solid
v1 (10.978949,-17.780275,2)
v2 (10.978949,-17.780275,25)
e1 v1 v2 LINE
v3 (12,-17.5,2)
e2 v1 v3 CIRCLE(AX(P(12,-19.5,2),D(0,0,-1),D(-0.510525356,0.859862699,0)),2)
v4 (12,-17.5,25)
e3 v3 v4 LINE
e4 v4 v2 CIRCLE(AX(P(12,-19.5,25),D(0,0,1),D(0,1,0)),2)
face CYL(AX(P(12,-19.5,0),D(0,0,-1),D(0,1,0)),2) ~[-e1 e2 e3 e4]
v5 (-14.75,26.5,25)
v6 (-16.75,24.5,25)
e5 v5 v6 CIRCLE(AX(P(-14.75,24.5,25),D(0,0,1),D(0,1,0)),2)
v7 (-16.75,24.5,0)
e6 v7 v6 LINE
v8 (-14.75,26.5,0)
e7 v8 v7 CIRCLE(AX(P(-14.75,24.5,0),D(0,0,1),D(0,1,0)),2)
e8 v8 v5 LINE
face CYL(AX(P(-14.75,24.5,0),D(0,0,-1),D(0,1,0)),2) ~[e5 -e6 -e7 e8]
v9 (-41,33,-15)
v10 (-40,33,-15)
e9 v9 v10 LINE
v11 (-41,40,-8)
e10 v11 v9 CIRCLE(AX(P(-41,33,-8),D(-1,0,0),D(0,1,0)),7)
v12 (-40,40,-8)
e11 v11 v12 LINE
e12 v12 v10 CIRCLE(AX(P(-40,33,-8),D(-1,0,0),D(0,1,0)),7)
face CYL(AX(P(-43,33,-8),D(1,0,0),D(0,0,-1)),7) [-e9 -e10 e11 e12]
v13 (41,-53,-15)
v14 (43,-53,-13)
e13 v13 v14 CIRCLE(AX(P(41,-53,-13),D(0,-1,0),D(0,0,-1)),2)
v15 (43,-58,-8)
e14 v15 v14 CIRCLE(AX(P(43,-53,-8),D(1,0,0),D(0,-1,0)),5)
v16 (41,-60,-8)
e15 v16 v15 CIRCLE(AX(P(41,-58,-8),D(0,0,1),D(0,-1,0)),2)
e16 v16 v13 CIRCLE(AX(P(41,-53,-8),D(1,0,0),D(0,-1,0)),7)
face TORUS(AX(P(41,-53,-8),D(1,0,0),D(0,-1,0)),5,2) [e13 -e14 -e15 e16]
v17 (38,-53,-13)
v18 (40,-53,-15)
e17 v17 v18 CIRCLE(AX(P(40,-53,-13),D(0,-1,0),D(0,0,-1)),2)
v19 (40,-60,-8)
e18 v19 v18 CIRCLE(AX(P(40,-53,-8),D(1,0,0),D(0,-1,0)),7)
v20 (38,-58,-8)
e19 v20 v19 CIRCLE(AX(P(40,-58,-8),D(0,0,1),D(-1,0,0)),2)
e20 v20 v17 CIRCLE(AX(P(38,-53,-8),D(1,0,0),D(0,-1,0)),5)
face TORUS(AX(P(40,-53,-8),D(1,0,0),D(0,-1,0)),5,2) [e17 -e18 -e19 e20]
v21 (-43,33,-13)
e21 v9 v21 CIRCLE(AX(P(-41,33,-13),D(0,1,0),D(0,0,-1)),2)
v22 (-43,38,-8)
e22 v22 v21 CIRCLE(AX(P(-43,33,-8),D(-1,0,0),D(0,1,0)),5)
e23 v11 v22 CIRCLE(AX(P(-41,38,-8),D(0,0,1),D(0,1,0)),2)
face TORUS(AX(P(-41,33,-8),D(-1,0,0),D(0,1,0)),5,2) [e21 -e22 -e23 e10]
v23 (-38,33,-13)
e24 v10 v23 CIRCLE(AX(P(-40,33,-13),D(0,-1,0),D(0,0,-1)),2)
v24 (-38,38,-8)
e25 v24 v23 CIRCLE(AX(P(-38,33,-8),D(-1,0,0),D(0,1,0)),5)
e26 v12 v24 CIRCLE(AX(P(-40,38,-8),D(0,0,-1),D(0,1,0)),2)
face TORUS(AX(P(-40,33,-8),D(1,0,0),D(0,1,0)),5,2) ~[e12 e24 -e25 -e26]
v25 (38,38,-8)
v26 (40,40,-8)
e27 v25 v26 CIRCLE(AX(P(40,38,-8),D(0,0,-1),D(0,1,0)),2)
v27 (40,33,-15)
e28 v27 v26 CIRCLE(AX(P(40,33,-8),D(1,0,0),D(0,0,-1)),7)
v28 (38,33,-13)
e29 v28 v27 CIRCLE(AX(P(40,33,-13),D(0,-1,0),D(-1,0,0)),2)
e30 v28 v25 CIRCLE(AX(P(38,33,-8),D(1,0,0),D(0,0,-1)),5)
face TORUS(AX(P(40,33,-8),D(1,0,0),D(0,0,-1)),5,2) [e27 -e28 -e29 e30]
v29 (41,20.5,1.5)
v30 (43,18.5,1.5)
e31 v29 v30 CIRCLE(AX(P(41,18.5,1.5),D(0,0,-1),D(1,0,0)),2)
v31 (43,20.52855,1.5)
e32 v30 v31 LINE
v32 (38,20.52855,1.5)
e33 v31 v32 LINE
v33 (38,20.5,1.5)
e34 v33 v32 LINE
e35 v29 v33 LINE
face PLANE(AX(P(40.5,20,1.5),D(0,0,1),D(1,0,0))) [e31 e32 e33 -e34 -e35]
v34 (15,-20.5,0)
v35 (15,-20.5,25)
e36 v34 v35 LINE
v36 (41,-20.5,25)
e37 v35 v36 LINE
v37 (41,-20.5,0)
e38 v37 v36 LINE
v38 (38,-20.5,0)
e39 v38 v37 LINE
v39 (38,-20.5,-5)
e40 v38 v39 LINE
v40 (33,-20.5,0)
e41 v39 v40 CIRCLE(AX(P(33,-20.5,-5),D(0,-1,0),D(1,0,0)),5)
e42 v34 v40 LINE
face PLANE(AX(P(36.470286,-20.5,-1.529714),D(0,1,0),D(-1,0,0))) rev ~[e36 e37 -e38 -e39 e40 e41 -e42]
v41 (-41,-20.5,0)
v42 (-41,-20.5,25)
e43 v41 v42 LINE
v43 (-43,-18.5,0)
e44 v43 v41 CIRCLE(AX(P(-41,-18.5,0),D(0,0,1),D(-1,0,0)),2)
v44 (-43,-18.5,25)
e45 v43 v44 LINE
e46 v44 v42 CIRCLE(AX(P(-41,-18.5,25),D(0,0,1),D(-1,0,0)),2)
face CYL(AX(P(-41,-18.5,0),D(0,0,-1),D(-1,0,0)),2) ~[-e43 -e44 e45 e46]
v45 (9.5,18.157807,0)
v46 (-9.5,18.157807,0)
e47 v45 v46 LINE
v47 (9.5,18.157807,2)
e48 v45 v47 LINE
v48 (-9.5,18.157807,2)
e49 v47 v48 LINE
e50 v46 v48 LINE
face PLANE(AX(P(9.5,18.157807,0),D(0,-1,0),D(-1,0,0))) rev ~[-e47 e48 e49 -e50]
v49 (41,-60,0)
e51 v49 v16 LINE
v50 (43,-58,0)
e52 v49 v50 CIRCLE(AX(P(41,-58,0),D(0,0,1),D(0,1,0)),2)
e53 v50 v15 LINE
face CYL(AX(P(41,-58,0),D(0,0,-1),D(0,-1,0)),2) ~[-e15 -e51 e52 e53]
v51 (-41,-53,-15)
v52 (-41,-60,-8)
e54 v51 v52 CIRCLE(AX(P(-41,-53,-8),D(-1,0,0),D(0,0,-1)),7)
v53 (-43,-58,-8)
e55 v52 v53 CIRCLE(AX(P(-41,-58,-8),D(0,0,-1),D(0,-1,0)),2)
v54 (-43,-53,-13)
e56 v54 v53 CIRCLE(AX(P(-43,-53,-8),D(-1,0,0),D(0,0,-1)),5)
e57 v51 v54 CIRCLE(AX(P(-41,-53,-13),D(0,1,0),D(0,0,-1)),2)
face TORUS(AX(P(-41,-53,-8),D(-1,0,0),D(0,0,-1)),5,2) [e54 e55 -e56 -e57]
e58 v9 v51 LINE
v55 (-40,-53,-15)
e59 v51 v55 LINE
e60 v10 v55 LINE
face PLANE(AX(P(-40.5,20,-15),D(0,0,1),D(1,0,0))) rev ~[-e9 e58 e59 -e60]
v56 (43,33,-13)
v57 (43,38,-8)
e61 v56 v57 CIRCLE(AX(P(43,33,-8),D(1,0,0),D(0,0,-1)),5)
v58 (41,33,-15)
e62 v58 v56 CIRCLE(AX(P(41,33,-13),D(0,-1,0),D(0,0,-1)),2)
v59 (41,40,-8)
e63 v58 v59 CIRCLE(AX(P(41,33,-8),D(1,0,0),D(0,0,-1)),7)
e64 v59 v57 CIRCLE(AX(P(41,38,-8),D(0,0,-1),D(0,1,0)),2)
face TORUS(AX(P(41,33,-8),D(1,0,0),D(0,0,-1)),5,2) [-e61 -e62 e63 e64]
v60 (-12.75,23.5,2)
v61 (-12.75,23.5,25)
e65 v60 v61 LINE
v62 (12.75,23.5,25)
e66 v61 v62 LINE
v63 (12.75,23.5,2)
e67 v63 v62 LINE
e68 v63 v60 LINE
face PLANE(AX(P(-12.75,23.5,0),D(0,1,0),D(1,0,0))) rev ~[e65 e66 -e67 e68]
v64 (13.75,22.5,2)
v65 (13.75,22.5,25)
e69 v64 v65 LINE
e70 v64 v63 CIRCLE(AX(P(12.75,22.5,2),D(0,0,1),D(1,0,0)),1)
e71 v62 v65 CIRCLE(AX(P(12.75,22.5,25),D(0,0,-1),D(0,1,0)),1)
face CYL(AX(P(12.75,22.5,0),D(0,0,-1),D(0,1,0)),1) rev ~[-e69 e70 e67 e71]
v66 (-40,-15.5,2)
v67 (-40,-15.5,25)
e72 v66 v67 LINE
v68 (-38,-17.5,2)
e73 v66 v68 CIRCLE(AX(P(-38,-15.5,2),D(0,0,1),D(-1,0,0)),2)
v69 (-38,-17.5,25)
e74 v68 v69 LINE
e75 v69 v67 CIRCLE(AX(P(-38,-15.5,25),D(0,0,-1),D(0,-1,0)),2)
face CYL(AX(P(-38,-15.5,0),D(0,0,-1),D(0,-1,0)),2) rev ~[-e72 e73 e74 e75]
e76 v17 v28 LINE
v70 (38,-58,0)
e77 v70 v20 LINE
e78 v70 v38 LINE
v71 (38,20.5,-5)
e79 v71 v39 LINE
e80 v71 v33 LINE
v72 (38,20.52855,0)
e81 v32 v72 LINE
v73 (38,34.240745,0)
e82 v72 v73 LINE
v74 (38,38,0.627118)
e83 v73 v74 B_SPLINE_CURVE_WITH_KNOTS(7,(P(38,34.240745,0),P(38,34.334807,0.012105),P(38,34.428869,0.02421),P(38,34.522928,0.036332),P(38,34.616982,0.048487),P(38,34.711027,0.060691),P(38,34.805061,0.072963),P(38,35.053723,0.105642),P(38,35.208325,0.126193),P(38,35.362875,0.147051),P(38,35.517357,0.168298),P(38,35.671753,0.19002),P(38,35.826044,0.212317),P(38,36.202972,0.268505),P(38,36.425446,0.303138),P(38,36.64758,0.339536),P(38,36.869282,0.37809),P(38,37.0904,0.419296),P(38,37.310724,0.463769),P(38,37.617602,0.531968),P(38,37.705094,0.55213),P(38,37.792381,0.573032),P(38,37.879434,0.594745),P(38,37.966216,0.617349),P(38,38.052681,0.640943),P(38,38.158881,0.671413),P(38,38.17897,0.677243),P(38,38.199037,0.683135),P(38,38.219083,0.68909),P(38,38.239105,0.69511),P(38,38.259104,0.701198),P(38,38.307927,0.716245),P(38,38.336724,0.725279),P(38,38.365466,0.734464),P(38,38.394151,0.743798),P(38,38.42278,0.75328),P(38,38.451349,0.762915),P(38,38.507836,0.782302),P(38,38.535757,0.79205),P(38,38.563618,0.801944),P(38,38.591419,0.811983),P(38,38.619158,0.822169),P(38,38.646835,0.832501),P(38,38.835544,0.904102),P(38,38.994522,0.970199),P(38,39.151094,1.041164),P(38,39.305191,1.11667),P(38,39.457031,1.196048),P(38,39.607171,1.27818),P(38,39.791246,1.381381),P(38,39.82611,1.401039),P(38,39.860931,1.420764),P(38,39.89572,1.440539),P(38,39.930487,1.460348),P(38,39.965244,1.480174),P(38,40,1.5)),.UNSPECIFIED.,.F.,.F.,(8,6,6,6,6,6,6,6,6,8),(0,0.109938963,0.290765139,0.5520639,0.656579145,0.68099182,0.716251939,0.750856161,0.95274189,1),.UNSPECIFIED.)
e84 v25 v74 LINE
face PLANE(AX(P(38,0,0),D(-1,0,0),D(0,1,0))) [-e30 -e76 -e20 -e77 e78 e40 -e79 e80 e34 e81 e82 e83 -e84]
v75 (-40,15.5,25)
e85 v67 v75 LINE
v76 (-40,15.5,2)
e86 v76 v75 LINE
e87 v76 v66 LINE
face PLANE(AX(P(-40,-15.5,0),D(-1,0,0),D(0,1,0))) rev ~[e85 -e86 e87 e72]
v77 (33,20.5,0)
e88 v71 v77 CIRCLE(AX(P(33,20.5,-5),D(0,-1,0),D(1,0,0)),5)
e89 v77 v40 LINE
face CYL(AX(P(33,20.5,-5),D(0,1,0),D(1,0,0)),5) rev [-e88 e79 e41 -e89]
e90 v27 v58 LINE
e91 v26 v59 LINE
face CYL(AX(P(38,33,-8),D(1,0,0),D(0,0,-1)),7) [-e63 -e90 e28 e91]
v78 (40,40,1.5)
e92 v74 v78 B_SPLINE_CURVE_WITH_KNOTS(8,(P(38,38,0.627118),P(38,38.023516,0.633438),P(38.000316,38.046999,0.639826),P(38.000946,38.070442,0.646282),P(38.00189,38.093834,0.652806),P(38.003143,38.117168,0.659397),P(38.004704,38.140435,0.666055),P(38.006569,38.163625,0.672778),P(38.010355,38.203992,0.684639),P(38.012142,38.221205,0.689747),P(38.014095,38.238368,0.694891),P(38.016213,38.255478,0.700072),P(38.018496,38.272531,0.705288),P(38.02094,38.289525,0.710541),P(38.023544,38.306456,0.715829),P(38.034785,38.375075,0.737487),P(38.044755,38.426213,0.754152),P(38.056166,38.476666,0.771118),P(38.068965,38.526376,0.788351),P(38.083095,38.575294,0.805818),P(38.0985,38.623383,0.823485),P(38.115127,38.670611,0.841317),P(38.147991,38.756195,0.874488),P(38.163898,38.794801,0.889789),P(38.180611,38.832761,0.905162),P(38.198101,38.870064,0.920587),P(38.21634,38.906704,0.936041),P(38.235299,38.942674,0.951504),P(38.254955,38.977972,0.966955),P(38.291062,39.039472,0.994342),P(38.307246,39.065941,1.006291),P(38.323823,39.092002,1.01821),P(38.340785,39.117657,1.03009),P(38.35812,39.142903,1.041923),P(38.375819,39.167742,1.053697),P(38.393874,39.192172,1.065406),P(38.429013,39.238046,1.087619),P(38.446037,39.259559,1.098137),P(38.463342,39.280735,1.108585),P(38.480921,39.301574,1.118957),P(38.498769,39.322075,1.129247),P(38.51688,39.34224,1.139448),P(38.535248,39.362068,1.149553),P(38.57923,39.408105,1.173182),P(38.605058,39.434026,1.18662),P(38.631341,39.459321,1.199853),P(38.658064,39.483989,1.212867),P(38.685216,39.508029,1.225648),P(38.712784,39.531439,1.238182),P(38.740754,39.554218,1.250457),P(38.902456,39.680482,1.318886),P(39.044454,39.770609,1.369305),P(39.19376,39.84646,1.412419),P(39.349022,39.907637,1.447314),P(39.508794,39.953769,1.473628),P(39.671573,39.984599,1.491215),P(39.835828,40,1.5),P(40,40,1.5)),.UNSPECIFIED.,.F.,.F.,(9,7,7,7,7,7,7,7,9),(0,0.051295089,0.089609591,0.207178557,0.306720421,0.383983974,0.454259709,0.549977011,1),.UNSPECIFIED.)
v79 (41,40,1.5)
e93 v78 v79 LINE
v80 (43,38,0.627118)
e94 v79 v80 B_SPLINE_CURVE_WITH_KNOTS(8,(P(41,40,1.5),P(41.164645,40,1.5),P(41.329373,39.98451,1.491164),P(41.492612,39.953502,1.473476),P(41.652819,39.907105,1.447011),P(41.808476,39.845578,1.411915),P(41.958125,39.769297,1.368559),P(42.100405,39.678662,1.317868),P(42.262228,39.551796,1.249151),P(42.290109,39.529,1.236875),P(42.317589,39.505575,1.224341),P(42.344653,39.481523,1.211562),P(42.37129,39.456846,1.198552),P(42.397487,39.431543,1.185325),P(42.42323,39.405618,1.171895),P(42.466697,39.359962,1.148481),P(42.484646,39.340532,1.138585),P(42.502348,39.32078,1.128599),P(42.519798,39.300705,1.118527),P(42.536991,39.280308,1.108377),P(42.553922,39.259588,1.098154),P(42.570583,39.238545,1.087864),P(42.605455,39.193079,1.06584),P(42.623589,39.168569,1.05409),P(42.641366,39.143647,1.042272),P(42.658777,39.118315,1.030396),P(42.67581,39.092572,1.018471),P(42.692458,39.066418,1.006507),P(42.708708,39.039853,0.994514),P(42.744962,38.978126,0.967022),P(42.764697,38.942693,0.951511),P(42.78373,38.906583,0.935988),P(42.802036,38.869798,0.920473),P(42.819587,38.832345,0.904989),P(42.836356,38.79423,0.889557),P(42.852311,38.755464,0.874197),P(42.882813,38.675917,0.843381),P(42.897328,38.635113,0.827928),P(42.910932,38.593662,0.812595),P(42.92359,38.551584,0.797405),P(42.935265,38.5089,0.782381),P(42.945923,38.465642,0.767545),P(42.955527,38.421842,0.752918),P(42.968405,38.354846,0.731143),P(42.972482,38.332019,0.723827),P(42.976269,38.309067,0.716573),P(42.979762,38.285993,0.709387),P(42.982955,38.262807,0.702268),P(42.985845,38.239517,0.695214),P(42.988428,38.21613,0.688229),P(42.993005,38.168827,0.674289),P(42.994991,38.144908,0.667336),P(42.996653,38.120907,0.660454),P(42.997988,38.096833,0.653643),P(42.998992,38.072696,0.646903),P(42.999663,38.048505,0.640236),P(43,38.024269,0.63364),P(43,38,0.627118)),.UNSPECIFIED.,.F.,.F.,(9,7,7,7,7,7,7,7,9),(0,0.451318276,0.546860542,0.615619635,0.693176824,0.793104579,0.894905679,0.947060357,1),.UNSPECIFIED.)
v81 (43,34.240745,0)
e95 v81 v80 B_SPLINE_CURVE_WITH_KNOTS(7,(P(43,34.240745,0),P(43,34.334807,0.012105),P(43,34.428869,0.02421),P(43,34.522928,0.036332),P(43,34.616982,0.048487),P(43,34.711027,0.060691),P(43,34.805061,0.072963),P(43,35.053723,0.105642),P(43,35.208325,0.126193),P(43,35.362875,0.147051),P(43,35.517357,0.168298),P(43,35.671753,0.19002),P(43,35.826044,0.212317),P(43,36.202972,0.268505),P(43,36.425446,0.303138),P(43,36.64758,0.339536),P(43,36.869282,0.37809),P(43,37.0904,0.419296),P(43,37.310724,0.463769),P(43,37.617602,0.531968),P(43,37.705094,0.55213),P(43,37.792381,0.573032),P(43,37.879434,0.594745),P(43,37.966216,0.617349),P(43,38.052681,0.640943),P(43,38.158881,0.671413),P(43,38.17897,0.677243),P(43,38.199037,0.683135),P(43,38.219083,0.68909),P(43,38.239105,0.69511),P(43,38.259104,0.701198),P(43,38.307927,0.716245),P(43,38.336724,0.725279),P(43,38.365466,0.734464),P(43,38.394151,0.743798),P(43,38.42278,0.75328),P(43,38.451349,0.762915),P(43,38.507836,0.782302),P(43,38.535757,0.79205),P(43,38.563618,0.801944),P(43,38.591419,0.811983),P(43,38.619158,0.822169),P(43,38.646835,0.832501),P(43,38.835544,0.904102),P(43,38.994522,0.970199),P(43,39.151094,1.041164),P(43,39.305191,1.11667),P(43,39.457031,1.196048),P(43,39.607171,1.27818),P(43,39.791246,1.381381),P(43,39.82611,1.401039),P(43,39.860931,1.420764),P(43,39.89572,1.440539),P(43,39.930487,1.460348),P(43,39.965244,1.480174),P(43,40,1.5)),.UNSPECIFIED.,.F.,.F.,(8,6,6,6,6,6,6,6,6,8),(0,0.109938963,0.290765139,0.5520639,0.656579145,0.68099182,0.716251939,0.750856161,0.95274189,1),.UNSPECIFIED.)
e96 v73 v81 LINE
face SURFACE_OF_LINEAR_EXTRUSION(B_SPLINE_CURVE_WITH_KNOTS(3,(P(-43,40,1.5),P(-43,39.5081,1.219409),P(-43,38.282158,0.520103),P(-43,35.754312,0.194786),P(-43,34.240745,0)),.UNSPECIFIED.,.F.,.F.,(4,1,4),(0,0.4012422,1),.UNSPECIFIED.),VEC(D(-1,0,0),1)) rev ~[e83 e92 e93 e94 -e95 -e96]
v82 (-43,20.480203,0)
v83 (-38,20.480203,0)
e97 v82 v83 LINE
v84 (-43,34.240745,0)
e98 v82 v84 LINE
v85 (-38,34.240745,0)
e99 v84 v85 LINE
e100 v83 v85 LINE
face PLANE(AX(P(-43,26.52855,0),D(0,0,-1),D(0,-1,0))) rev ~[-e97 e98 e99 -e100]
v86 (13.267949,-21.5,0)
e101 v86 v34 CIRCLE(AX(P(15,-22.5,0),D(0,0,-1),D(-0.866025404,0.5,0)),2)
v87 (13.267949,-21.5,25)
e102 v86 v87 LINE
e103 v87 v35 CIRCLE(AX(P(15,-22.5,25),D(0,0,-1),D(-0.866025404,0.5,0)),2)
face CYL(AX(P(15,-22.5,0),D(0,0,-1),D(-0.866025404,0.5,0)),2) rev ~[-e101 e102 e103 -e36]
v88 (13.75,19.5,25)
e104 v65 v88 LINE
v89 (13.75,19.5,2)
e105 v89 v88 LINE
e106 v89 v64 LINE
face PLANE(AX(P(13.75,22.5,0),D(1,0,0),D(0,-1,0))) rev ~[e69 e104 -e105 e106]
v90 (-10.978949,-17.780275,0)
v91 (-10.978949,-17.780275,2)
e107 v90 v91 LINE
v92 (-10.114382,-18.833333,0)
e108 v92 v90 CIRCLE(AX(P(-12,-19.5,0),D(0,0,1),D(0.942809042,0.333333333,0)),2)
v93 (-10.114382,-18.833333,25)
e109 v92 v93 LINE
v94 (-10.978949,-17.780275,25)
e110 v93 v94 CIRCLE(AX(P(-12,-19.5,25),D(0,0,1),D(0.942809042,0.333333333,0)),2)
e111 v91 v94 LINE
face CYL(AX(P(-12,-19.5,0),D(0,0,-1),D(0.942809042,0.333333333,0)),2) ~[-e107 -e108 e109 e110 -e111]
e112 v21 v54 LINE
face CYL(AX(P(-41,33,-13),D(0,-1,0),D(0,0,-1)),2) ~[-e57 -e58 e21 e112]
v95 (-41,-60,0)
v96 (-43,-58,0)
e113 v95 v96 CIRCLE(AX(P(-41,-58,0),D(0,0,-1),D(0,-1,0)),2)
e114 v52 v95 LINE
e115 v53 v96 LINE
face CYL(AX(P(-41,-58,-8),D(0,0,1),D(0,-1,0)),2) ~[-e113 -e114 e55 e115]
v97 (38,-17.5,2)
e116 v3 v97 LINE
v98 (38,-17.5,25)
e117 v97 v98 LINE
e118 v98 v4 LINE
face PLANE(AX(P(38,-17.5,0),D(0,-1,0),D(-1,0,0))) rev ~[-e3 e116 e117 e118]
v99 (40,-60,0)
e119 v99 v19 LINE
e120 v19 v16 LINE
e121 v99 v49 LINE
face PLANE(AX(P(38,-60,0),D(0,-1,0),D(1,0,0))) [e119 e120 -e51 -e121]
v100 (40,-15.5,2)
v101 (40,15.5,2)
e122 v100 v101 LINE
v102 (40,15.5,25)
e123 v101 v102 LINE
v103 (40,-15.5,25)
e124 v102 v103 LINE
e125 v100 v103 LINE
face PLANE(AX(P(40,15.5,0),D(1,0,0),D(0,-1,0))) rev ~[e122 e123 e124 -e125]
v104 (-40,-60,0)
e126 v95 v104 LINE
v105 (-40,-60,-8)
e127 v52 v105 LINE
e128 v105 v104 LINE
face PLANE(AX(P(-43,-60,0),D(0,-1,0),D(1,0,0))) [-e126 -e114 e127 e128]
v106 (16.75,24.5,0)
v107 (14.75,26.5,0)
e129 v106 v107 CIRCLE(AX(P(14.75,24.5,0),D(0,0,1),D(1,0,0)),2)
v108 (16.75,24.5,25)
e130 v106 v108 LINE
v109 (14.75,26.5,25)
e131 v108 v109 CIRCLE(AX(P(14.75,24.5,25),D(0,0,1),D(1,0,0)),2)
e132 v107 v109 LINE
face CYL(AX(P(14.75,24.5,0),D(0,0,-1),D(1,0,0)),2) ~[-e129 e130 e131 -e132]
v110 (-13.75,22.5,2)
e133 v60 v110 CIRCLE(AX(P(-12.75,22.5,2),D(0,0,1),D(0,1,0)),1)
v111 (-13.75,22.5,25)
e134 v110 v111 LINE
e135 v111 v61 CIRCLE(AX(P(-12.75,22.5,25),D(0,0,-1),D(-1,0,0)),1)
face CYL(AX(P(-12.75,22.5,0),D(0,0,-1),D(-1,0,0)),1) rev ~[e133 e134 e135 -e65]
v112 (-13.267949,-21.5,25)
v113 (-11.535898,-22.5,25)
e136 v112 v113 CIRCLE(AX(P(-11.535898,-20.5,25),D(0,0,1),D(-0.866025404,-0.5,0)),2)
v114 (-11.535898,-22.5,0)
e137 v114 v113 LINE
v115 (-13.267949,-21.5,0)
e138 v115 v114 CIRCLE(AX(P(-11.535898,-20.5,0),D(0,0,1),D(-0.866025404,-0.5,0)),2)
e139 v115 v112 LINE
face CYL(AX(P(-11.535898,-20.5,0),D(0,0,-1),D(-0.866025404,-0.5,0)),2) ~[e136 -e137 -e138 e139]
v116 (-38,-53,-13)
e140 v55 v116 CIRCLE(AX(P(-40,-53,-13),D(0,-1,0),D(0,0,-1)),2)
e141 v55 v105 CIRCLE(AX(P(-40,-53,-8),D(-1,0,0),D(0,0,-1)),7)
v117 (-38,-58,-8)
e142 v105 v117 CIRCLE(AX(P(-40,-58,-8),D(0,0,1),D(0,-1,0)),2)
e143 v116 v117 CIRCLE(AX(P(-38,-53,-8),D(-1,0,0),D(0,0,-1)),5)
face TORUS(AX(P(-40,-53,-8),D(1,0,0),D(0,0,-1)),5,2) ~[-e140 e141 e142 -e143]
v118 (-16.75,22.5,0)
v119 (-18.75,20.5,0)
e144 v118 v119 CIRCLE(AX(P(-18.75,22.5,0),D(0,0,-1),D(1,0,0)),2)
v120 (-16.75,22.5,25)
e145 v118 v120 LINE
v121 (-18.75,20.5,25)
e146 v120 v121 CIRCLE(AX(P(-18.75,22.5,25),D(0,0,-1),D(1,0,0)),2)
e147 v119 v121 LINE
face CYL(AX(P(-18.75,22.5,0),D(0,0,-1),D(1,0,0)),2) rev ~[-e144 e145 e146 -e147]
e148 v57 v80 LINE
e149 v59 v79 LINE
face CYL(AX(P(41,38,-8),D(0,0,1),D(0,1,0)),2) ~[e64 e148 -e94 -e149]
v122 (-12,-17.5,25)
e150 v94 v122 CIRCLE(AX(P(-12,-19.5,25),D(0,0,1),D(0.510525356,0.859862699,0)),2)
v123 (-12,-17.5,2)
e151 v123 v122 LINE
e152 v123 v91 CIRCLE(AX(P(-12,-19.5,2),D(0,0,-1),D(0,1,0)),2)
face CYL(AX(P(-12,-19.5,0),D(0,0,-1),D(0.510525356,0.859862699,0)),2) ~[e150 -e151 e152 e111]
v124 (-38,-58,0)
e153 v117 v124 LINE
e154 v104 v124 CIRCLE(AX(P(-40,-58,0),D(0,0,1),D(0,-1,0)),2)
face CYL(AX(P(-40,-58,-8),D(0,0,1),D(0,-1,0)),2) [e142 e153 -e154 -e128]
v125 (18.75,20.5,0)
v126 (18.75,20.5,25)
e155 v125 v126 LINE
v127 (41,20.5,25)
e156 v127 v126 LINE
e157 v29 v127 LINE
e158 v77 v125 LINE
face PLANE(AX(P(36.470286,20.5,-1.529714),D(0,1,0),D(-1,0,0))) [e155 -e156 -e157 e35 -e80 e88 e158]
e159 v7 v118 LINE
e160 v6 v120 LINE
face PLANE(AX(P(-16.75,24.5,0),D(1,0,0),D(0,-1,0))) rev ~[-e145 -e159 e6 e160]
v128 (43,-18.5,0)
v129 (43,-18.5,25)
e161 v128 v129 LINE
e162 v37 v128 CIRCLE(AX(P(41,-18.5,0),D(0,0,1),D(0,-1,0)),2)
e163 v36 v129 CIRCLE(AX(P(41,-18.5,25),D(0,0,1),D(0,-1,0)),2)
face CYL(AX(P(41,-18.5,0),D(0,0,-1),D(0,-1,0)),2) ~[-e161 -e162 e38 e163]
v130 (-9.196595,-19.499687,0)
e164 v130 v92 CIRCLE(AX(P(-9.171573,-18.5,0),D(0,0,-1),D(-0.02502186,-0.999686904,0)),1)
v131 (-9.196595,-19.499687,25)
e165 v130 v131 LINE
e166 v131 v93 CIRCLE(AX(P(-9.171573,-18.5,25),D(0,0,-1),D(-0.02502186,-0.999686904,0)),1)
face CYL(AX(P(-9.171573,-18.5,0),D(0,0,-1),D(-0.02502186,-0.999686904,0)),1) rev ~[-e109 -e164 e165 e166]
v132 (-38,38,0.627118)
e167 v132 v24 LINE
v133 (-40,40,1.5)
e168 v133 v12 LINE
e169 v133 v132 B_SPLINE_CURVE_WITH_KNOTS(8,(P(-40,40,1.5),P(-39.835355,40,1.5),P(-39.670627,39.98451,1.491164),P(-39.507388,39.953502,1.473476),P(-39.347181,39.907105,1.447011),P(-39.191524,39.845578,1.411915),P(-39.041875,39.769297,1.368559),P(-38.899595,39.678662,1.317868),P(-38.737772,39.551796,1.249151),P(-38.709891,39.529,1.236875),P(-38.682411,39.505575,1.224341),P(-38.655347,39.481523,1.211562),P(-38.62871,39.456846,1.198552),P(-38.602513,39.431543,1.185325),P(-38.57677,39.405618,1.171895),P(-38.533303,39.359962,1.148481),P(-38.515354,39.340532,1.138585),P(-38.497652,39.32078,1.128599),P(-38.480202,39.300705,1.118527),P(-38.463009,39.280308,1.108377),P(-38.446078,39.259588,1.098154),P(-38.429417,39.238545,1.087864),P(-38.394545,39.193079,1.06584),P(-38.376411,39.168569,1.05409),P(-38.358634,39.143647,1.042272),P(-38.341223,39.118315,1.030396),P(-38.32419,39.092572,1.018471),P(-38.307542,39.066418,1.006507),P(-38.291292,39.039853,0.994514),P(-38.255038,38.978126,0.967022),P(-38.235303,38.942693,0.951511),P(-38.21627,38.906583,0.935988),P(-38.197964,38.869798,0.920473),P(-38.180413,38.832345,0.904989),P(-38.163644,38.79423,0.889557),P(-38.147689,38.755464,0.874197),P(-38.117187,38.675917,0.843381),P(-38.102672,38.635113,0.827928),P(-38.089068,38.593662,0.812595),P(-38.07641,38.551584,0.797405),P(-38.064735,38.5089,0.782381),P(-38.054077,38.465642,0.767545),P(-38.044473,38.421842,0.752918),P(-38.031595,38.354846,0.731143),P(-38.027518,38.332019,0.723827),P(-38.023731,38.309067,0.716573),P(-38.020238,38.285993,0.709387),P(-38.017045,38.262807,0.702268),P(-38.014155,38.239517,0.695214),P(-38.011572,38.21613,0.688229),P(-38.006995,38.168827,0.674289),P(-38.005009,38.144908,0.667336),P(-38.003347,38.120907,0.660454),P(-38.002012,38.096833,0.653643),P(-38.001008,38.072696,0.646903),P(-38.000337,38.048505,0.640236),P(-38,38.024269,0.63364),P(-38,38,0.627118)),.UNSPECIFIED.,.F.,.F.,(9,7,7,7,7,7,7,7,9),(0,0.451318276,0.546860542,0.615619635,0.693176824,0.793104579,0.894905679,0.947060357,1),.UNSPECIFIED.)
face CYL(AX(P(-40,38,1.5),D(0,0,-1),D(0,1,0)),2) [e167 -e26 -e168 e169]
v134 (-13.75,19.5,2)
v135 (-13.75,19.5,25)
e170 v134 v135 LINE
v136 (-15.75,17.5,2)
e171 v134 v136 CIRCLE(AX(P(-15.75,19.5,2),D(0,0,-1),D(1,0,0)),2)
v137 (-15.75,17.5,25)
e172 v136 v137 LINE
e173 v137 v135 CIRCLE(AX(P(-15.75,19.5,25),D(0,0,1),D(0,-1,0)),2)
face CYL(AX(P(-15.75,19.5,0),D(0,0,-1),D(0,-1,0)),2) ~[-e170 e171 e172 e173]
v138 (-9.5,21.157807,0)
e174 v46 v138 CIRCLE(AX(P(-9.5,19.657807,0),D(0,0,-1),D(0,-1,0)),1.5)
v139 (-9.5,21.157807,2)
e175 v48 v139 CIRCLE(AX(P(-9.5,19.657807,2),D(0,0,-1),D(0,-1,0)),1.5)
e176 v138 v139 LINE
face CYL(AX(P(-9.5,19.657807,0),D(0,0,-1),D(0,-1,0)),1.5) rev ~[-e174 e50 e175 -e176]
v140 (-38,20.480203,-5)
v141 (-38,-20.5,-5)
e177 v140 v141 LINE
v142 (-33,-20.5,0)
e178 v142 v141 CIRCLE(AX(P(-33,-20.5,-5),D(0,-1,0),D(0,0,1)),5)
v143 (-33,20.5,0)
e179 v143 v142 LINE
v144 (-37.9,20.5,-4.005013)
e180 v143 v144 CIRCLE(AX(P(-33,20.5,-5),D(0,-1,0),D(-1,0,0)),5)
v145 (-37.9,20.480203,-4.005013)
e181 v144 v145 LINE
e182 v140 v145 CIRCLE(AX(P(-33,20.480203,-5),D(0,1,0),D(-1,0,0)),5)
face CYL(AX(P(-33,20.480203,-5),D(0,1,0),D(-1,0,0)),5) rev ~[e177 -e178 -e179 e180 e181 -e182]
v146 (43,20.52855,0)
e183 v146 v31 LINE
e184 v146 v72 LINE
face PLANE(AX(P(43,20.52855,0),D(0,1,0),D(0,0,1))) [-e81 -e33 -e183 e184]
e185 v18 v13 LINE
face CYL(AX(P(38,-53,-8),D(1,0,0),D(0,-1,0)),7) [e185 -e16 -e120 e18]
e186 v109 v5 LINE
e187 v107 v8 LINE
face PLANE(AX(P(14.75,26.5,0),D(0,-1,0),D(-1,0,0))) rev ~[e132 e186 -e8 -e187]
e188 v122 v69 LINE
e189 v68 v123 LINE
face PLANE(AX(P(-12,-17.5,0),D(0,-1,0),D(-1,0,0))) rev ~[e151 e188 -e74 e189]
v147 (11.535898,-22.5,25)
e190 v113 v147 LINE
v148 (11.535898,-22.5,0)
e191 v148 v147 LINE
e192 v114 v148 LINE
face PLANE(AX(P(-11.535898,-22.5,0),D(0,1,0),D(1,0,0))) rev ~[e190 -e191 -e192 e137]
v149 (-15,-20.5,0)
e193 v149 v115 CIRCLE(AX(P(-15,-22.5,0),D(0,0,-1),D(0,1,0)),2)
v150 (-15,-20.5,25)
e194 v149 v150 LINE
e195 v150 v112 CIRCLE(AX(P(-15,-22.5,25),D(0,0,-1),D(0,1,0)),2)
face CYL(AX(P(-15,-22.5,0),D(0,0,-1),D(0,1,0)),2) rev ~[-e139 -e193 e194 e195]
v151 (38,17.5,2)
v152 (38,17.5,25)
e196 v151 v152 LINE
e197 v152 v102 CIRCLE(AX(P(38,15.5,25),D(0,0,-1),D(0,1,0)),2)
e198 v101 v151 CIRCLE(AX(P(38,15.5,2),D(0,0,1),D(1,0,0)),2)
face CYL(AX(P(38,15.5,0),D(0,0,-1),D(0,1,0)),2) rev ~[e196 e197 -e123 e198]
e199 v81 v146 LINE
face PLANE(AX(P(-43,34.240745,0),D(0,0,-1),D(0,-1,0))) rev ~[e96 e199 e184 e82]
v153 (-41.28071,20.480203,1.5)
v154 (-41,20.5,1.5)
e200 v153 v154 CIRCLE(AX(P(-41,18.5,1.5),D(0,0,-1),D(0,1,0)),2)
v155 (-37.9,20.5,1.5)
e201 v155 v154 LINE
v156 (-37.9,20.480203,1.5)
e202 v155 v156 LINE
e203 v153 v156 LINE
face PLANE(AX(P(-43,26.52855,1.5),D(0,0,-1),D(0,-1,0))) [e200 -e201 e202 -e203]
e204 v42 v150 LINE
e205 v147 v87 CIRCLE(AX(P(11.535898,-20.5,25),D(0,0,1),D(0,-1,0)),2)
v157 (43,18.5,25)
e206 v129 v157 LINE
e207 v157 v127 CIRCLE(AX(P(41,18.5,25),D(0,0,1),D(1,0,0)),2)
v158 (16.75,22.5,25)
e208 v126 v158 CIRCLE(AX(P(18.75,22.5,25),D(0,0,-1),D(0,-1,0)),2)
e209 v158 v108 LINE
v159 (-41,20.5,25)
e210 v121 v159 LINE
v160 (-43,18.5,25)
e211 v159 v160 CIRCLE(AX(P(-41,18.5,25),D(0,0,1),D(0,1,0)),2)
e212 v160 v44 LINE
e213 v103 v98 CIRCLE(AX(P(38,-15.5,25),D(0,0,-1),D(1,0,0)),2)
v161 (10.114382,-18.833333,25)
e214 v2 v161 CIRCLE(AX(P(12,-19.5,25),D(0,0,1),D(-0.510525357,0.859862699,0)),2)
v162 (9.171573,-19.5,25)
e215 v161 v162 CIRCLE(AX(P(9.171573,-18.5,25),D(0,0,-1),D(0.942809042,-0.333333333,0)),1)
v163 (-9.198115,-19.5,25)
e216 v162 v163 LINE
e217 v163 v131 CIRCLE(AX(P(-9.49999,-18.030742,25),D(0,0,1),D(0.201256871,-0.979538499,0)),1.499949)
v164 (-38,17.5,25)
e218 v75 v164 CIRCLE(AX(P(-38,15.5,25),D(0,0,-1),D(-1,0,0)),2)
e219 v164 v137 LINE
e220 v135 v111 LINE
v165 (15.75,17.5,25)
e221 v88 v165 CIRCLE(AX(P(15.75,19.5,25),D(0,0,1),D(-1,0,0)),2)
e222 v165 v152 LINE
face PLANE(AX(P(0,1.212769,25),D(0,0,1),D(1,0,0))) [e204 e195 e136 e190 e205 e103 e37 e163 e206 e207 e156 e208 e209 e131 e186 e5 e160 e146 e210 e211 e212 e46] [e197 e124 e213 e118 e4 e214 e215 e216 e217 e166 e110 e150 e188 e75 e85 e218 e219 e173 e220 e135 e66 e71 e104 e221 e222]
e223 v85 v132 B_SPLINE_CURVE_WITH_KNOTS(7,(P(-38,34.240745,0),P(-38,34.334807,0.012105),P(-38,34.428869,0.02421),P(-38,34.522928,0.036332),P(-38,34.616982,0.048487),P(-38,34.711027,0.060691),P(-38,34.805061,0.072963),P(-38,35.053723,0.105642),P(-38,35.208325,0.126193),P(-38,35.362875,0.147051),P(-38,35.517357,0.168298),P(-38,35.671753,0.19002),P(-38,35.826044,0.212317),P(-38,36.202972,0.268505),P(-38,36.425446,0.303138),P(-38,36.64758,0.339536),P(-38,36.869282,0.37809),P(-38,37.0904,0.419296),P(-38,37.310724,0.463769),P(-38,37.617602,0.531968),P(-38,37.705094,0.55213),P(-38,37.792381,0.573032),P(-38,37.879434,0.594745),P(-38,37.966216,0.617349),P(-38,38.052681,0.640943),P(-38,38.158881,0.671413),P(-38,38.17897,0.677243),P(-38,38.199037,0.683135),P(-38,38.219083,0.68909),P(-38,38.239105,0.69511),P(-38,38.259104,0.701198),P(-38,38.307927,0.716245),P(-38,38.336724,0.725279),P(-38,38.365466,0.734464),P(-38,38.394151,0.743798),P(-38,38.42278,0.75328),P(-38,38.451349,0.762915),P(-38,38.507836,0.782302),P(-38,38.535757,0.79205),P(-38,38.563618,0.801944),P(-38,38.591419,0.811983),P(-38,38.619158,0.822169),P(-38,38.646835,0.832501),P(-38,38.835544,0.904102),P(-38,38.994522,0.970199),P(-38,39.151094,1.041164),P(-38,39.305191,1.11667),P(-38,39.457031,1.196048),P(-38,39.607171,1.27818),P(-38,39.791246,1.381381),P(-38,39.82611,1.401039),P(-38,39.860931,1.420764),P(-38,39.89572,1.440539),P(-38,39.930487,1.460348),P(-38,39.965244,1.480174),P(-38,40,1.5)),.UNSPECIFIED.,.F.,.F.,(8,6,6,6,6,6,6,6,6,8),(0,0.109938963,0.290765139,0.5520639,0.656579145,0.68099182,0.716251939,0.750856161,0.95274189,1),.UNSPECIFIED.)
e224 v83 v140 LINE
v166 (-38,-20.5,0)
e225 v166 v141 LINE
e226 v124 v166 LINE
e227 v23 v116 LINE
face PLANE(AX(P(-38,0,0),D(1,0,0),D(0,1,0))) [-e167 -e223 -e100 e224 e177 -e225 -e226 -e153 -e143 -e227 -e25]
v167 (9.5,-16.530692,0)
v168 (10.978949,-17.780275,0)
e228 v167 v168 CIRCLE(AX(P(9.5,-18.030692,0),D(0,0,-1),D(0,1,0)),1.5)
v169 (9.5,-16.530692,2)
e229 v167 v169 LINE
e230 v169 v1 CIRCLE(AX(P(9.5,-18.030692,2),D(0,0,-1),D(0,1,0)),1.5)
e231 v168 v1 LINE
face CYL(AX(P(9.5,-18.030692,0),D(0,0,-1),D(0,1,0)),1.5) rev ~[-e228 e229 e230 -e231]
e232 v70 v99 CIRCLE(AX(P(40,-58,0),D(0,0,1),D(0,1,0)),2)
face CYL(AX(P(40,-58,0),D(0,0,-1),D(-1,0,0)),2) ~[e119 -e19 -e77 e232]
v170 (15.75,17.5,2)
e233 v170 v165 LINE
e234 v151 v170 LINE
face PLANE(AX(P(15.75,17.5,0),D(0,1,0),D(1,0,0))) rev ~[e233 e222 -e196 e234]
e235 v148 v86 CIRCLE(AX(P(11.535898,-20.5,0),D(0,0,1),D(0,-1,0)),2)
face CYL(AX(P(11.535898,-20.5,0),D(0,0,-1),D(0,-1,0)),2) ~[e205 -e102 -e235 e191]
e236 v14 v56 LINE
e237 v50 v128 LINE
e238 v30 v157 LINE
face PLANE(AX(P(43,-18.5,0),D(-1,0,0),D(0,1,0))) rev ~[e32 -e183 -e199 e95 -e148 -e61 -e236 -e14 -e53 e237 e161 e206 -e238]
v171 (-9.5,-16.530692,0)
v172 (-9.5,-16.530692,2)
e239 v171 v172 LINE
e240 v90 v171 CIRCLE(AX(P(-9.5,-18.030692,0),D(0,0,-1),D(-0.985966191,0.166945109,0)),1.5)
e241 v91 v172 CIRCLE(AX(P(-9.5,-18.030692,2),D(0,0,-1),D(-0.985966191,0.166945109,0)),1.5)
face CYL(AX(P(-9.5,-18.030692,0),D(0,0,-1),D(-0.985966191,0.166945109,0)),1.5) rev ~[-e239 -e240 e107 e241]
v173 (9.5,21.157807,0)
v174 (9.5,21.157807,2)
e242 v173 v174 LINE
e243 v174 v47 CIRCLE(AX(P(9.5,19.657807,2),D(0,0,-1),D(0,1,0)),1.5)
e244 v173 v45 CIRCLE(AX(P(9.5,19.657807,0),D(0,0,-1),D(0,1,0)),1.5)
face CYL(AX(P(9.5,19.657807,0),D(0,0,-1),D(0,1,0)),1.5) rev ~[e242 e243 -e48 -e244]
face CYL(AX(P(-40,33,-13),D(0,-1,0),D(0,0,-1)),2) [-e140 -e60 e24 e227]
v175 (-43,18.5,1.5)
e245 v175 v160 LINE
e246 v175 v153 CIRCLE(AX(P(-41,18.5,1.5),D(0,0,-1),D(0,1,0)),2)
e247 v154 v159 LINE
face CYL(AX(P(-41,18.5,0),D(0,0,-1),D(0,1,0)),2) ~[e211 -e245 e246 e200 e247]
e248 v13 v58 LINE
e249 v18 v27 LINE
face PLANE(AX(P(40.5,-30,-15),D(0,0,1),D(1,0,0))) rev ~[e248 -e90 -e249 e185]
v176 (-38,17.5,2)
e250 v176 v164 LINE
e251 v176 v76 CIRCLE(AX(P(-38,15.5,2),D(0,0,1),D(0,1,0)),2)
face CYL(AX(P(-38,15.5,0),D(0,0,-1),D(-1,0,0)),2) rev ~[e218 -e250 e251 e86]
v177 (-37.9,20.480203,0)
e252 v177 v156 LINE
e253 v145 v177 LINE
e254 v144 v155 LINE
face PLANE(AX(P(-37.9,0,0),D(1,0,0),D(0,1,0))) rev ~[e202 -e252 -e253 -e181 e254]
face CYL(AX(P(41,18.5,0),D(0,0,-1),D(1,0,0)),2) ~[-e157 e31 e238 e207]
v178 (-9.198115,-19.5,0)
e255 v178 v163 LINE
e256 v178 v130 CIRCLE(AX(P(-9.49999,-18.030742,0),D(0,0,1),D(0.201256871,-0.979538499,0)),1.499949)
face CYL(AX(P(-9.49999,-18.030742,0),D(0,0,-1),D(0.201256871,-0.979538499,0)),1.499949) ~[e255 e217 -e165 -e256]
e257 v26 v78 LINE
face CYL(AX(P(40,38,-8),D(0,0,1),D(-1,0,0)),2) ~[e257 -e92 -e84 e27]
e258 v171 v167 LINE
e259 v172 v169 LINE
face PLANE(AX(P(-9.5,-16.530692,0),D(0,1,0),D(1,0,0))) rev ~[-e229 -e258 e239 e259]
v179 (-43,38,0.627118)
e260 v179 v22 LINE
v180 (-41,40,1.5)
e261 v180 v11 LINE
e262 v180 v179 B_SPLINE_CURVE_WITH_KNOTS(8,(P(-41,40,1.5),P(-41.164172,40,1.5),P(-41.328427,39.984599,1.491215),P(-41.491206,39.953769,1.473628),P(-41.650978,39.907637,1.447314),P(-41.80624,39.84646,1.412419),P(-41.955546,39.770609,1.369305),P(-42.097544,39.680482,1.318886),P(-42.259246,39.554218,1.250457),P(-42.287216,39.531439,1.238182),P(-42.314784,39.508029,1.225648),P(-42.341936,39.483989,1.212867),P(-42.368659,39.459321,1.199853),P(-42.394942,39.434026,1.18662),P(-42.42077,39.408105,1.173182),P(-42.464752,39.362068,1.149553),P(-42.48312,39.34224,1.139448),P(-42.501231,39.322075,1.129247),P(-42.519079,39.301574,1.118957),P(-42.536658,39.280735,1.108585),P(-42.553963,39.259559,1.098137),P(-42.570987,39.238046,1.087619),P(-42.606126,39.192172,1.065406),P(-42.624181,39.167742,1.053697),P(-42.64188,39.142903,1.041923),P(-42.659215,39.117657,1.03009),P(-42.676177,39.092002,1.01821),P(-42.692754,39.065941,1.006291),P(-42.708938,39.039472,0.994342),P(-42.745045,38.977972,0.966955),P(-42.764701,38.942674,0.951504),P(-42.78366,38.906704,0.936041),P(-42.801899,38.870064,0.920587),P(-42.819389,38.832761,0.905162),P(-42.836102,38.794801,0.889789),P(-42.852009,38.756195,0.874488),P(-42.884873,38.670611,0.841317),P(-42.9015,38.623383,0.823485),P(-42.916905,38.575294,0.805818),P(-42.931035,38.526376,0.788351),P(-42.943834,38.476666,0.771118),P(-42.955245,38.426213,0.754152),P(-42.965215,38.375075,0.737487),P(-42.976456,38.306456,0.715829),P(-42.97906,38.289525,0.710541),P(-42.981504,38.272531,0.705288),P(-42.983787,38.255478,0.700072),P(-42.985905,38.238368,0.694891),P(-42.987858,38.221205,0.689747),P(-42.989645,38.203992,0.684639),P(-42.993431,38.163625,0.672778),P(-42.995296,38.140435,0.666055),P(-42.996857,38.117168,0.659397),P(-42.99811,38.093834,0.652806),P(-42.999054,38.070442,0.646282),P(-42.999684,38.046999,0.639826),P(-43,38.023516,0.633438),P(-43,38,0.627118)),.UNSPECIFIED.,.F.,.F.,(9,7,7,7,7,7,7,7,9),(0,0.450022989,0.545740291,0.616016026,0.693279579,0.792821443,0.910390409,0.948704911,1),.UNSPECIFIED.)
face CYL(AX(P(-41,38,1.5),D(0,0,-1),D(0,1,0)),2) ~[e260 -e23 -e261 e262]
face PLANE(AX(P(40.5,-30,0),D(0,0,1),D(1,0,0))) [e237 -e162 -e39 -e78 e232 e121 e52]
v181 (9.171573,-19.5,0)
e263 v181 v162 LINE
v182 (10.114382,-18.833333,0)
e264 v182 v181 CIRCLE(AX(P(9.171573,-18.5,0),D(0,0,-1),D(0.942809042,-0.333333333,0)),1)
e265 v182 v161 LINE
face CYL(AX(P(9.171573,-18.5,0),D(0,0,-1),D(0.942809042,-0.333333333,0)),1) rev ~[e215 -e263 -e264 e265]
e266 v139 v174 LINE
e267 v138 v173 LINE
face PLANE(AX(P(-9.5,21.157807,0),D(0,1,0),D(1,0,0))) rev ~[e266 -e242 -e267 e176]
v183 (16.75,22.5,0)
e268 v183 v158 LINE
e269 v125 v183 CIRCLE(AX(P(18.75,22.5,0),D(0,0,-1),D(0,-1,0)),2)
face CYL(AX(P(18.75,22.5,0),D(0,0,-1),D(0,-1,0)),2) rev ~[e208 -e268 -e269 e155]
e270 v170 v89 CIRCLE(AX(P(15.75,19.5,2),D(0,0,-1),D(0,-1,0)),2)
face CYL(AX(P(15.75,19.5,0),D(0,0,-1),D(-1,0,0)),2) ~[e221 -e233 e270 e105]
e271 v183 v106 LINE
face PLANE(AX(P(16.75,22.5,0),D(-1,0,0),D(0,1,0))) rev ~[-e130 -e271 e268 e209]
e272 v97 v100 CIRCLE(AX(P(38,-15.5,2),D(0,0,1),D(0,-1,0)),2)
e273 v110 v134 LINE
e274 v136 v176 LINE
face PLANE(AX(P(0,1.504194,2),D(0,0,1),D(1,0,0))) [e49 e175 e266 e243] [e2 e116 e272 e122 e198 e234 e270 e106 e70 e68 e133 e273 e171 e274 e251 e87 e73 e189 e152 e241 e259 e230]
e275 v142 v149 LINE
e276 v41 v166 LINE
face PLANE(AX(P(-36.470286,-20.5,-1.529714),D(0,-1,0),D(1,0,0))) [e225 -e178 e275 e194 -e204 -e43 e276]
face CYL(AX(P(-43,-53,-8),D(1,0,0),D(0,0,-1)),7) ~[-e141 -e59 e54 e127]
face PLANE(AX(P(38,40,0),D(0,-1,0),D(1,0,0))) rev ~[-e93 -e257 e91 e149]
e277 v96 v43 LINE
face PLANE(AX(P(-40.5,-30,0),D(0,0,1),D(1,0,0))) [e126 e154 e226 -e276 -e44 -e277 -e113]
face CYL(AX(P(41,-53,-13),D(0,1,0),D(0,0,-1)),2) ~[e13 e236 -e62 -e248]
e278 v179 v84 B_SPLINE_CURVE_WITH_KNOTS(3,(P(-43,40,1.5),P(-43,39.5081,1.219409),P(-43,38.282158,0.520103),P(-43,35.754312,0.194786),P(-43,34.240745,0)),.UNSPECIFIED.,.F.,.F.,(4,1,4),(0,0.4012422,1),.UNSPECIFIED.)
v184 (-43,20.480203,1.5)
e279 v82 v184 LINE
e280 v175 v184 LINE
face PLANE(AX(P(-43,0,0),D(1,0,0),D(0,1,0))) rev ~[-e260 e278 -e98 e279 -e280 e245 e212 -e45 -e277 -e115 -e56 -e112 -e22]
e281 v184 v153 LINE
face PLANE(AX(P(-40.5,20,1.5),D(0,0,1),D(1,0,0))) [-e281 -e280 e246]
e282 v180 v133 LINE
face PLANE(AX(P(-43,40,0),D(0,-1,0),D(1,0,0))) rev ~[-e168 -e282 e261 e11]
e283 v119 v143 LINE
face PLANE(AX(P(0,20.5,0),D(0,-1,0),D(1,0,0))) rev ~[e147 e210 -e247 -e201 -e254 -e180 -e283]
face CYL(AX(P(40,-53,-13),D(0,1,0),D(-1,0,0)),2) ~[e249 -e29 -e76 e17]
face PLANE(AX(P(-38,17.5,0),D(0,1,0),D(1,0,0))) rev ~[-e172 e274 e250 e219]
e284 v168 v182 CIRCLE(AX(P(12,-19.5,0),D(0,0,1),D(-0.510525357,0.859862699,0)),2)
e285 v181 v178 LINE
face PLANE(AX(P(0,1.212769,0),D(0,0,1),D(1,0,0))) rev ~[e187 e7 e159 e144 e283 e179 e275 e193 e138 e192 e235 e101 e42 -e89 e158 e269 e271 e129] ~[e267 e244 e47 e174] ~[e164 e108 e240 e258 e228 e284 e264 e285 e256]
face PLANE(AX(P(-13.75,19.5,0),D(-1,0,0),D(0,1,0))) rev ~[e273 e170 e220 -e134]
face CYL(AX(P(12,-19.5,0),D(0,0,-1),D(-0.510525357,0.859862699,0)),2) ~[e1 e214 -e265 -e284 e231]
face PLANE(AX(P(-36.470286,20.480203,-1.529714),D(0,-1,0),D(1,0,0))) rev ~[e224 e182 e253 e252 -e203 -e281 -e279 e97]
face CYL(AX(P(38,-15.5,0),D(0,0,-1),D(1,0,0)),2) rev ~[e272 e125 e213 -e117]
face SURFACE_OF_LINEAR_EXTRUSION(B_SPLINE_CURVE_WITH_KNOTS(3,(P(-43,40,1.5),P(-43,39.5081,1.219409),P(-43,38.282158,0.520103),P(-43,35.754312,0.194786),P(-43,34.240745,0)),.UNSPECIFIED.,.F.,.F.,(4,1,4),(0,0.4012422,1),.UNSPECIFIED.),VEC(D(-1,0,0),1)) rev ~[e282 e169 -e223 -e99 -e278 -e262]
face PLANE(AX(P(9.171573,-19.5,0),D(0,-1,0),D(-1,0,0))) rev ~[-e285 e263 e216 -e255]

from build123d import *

# Parameters (mm, degrees)
F1_DEPTH      = 2
F2_DEPTH      = 25
F3_W          = 5
F3_H          = 60
F4_DEPTH      = 15
F3_H_2        = 40
F5_DEPTH      = 15
F5_DEPTH_BACK = 1.5
F6_R          = 7
F8_DEPTH      = 86.001
F7_W          = 6.048347801
F7_H          = 1.5
F9_DEPTH      = 5.1
F10_W         = 6
F10_H         = 1.5
F11_DEPTH     = 5.1
F12_T1_DEPTH  = 41
F12_T3_DEPTH  = 40.980202511
F12_T8_DEPTH  = 53.480202511
F13_R         = 2


# Not quite as in the source:
# - a fillet or chamfer that OpenCascade refuses, or shapes differently, is made with other operations: its cross-section is extruded or revolved along the edge and cut away or added


with BuildPart() as f1:
    # F0 (on Top) → F1 (new body)
    with BuildSketch(Plane.XY):
        with BuildLine():
            ThreePointArc((40, 15.5), (39.4142135624, 16.9142135624), (38, 17.5))
            Line((38, 17.5), (15.75, 17.5))
            ThreePointArc((15.75, 17.5), (14.3357864376, 18.0857864376), (13.75, 19.5))
            Line((13.75, 19.5), (13.75, 22.5))
            ThreePointArc((13.75, 22.5), (13.4571067812, 23.2071067812), (12.75, 23.5))
            Line((12.75, 23.5), (-12.75, 23.5))
            ThreePointArc((-12.75, 23.5), (-13.4571067812, 23.2071067812), (-13.75, 22.5))
            Line((-13.75, 22.5), (-13.75, 19.5))
            ThreePointArc((-13.75, 19.5), (-14.3357864376, 18.0857864376), (-15.75, 17.5))
            Line((-15.75, 17.5), (-38, 17.5))
            ThreePointArc((-38, 17.5), (-39.4142135624, 16.9142135624), (-40, 15.5))
            Line((-40, 15.5), (-40, -15.5))
            ThreePointArc((-40, -15.5), (-39.4142135624, -16.9142135624), (-38, -17.5))
            Line((-38, -17.5), (-12, -17.5))
            ThreePointArc((-12, -17.5), (-11.4705903261, -17.5713410366), (-10.978949287, -17.7802746029))
            ThreePointArc((-10.978949287, -17.7802746029), (-10.4680840625, -16.8849116385), (-9.5, -16.5306922667))
            Line((-9.5, -16.5306922667), (0, -16.5306922667))
            Line((0, -16.5306922667), (9.5, -16.5306922667))
            ThreePointArc((9.5, -16.5306922667), (10.4680840625, -16.8849116385), (10.978949287, -17.7802746029))
            ThreePointArc((10.978949287, -17.7802746029), (11.4705903261, -17.5713410366), (12, -17.5))
            Line((12, -17.5), (38, -17.5))
            ThreePointArc((38, -17.5), (39.4142135624, -16.9142135624), (40, -15.5))
            Line((40, -15.5), (40, 15.5))
        make_face()
        with BuildLine():
            ThreePointArc((-9.5, 18.1578074247), (-11, 19.6578074247), (-9.5, 21.1578074247))
            Line((-9.5, 21.1578074247), (0, 21.1578074247))
            Line((0, 21.1578074247), (9.5, 21.1578074247))
            ThreePointArc((9.5, 21.1578074247), (11, 19.6578074247), (9.5, 18.1578074247))
            Line((9.5, 18.1578074247), (0, 18.1578074247))
            Line((0, 18.1578074247), (-9.5, 18.1578074247))
        make_face(mode=Mode.SUBTRACT)
    extrude(amount=F1_DEPTH)

    # F0 (on Top) → F2 (join)
    with BuildSketch(Plane.XY):
        with BuildLine():
            ThreePointArc((43, 18.5), (42.4142135624, 19.9142135624), (41, 20.5))
            Line((41, 20.5), (18.75, 20.5))
            ThreePointArc((18.75, 20.5), (17.3357864376, 21.0857864376), (16.75, 22.5))
            Line((16.75, 22.5), (16.75, 24.5))
            ThreePointArc((16.75, 24.5), (16.1642135624, 25.9142135624), (14.75, 26.5))
            Line((14.75, 26.5), (-14.75, 26.5))
            ThreePointArc((-14.75, 26.5), (-16.1642135624, 25.9142135624), (-16.75, 24.5))
            Line((-16.75, 24.5), (-16.75, 22.5))
            ThreePointArc((-16.75, 22.5), (-17.3357864376, 21.0857864376), (-18.75, 20.5))
            Line((-18.75, 20.5), (-41, 20.5))
            ThreePointArc((-41, 20.5), (-42.4142135624, 19.9142135624), (-43, 18.5))
            Line((-43, 18.5), (-43, -18.5))
            ThreePointArc((-43, -18.5), (-42.4142135624, -19.9142135624), (-41, -20.5))
            Line((-41, -20.5), (-15, -20.5))
            ThreePointArc((-15, -20.5), (-14, -20.7679491924), (-13.2679491924, -21.5))
            ThreePointArc((-13.2679491924, -21.5), (-12.5358983849, -22.2320508076), (-11.5358983849, -22.5))
            Line((-11.5358983849, -22.5), (11.5358983849, -22.5))
            ThreePointArc((11.5358983849, -22.5), (12.5358983849, -22.2320508076), (13.2679491924, -21.5))
            ThreePointArc((13.2679491924, -21.5), (14, -20.7679491924), (15, -20.5))
            Line((15, -20.5), (41, -20.5))
            ThreePointArc((41, -20.5), (42.4142135624, -19.9142135624), (43, -18.5))
            Line((43, -18.5), (43, 18.5))
        make_face()
        with BuildLine():
            Line((15.75, 17.5), (38, 17.5))
            ThreePointArc((38, 17.5), (39.4142135624, 16.9142135624), (40, 15.5))
            Line((40, 15.5), (40, -15.5))
            ThreePointArc((40, -15.5), (39.4142135624, -16.9142135624), (38, -17.5))
            Line((38, -17.5), (12, -17.5))
            ThreePointArc((12, -17.5), (11.4705903261, -17.5713410366), (10.978949287, -17.7802746029))
            ThreePointArc((10.978949287, -17.7802746029), (10.4542270396, -18.2309113684), (10.1143819168, -18.8333333333))
            ThreePointArc((10.1143819168, -18.8333333333), (9.7489231444, -19.3164965809), (9.1715728753, -19.5))
            Line((9.1715728753, -19.5), (0, -19.5))
            Line((0, -19.5), (-9.1715728753, -19.5))
            Line((-9.1715728753, -19.5), (-9.1981146163, -19.5))
            ThreePointArc((-9.1981146163, -19.5), (-9.1973546351, -19.4998436487), (-9.1965947349, -19.4996869043))
            ThreePointArc((-9.1965947349, -19.4996869043), (-9.7590938823, -19.3092089139), (-10.1143819168, -18.8333333333))
            ThreePointArc((-10.1143819168, -18.8333333333), (-10.4542270396, -18.2309113684), (-10.978949287, -17.7802746029))
            ThreePointArc((-10.978949287, -17.7802746029), (-11.4705903261, -17.5713410366), (-12, -17.5))
            Line((-12, -17.5), (-38, -17.5))
            ThreePointArc((-38, -17.5), (-39.4142135624, -16.9142135624), (-40, -15.5))
            Line((-40, -15.5), (-40, 15.5))
            ThreePointArc((-40, 15.5), (-39.4142135624, 16.9142135624), (-38, 17.5))
            Line((-38, 17.5), (-15.75, 17.5))
            ThreePointArc((-15.75, 17.5), (-14.3357864376, 18.0857864376), (-13.75, 19.5))
            Line((-13.75, 19.5), (-13.75, 22.5))
            ThreePointArc((-13.75, 22.5), (-13.4571067812, 23.2071067812), (-12.75, 23.5))
            Line((-12.75, 23.5), (12.75, 23.5))
            ThreePointArc((12.75, 23.5), (13.4571067812, 23.2071067812), (13.75, 22.5))
            Line((13.75, 22.5), (13.75, 19.5))
            ThreePointArc((13.75, 19.5), (14.3357864376, 18.0857864376), (15.75, 17.5))
        make_face(mode=Mode.SUBTRACT)
    extrude(amount=F2_DEPTH)

    # F3 (on Top) → F4 (join)
    with BuildSketch(Plane.XY):
        with Locations((-40.5, -30)):
            Rectangle(F3_W, F3_H)
        with Locations((40.5, -30)):
            Rectangle(F3_W, F3_H)
    extrude(amount=-F4_DEPTH)

    # F3 (on Top) → F5 (join, two sides)
    with BuildSketch(Plane.XY) as f5_sk:
        with Locations((-40.5, 20)):
            Rectangle(F3_W, F3_H_2)
        with Locations((40.5, 20)):
            Rectangle(F3_W, F3_H_2)
    extrude(amount=-F5_DEPTH)
    extrude(f5_sk.sketch, amount=F5_DEPTH_BACK)

    # F6
    f6_edges = [f1.edges().sort_by_distance(p)[0] for p in [
        (40.5, 40, -15),
        (-40.5, 40, -15),
        (-40.5, -60, -15),
        (40.5, -60, -15),
    ]]
    fillet(f6_edges, radius=F6_R)

    # F7 (on face) → F8 (cut, through all)
    with BuildSketch(Plane(origin=(-43, 0, 0), x_dir=(0, -1, 0), z_dir=(-1, 0, 0))):
        with BuildLine():
            Line((-26.5285503119, 1.5), (-40, 1.5))
            add(Edge.make_bspline(
                [(-40, 1.5), (-39.5081001265, 1.219408998), (-38.2821576057, 0.5201031862), (-35.7543121769, 0.1947861269), (-34.240745008, 0)],
                knots=[0, 0, 0, 0, 0.4012421995, 1, 1, 1, 1], degree=3))
            Line((-34.240745008, 0), (-26.5285503119, 0))
            Line((-26.5285503119, 0), (-26.5285503119, 1.5))
        make_face()
    extrude(amount=-F8_DEPTH, mode=Mode.SUBTRACT)

    # F7 (on face) → F9 (cut)
    with BuildSketch(Plane(origin=(-43, 0, 0), x_dir=(0, -1, 0), z_dir=(-1, 0, 0))):
        with Locations((-23.5043764114, 0.75)):
            Rectangle(F7_W, F7_H)
    extrude(amount=-F9_DEPTH, mode=Mode.SUBTRACT)

    # F10 (on face) → F11 (cut)
    with BuildSketch(Plane.YZ.offset(43)):
        with Locations((23.5285503119, 0.75)):
            Rectangle(F10_W, F10_H)
    extrude(amount=-F11_DEPTH, mode=Mode.SUBTRACT)

    # F12: fillet of radius 5 on 2 edges, made by hand

    # F12_s2 → F12_t1 (join)
    with BuildSketch(Plane.XZ.offset(-20.5)):
        with BuildLine():
            ThreePointArc((38, -5), (36.5355339059, -1.4644660941), (33, 0))
            Line((33, 0), (38, 0))
            Line((38, 0), (38, -5))
        make_face()
    extrude(amount=F12_T1_DEPTH)

    # F12_s4 → F12_t3 (join)
    with BuildSketch(Plane.XZ.offset(-20.480202511)):
        with BuildLine():
            ThreePointArc((-38, -5), (-36.5355339059, -1.4644660941), (-33, 0))
            Line((-33, 0), (-38, 0))
            Line((-38, 0), (-38, -5))
        make_face()
    extrude(amount=F12_T3_DEPTH)


with BuildPart() as f12_tool6:
    # F12_s7 → F12_t8 (new body)
    with BuildSketch(Plane.XZ.offset(20.5)):
        with BuildLine():
            ThreePointArc((-38, -5), (-36.5355339059, -1.4644660941), (-33, 0))
            Line((-33, 0), (-38, 0))
            Line((-38, 0), (-38, -5))
        make_face()
    extrude(amount=-F12_T8_DEPTH)

    split(bisect_by=Plane.XZ.offset(-20.5), keep=Keep.TOP)

    split(bisect_by=Plane.YZ.offset(-37.9), keep=Keep.TOP)


with BuildPart() as f1_1:
    add(f1.part)

    # F12_t5: union F12_tool6
    add(f12_tool6.part)

    # F13
    f13_edges = [f1_1.edges().sort_by_distance(p)[0] for p in [
        (-38, 40, -3.25),
        (-43, 40, -3.25),
        (38, 40, -3.25),
        (43, 40, -3.25),
        (43, 37.949747, -12.949747),
        (43, -10, -15),
        (43, -57.949747, -12.949747),
        (43, -60, -4),
        (38, -57.949747, -12.949747),
        (38, -60, -4),
        (38, 37.949747, -12.949747),
        (38, -10, -15),
        (-38, -60, -4),
        (-38, 37.949747, -12.949747),
        (-38, -10, -15),
        (-38, -57.949747, -12.949747),
        (-43, -57.949747, -12.949747),
        (-43, -10, -15),
        (-43, 37.949747, -12.949747),
        (-43, -60, -4),
    ]]
    fillet(f13_edges, radius=F13_R)


solid = f1_1.part
